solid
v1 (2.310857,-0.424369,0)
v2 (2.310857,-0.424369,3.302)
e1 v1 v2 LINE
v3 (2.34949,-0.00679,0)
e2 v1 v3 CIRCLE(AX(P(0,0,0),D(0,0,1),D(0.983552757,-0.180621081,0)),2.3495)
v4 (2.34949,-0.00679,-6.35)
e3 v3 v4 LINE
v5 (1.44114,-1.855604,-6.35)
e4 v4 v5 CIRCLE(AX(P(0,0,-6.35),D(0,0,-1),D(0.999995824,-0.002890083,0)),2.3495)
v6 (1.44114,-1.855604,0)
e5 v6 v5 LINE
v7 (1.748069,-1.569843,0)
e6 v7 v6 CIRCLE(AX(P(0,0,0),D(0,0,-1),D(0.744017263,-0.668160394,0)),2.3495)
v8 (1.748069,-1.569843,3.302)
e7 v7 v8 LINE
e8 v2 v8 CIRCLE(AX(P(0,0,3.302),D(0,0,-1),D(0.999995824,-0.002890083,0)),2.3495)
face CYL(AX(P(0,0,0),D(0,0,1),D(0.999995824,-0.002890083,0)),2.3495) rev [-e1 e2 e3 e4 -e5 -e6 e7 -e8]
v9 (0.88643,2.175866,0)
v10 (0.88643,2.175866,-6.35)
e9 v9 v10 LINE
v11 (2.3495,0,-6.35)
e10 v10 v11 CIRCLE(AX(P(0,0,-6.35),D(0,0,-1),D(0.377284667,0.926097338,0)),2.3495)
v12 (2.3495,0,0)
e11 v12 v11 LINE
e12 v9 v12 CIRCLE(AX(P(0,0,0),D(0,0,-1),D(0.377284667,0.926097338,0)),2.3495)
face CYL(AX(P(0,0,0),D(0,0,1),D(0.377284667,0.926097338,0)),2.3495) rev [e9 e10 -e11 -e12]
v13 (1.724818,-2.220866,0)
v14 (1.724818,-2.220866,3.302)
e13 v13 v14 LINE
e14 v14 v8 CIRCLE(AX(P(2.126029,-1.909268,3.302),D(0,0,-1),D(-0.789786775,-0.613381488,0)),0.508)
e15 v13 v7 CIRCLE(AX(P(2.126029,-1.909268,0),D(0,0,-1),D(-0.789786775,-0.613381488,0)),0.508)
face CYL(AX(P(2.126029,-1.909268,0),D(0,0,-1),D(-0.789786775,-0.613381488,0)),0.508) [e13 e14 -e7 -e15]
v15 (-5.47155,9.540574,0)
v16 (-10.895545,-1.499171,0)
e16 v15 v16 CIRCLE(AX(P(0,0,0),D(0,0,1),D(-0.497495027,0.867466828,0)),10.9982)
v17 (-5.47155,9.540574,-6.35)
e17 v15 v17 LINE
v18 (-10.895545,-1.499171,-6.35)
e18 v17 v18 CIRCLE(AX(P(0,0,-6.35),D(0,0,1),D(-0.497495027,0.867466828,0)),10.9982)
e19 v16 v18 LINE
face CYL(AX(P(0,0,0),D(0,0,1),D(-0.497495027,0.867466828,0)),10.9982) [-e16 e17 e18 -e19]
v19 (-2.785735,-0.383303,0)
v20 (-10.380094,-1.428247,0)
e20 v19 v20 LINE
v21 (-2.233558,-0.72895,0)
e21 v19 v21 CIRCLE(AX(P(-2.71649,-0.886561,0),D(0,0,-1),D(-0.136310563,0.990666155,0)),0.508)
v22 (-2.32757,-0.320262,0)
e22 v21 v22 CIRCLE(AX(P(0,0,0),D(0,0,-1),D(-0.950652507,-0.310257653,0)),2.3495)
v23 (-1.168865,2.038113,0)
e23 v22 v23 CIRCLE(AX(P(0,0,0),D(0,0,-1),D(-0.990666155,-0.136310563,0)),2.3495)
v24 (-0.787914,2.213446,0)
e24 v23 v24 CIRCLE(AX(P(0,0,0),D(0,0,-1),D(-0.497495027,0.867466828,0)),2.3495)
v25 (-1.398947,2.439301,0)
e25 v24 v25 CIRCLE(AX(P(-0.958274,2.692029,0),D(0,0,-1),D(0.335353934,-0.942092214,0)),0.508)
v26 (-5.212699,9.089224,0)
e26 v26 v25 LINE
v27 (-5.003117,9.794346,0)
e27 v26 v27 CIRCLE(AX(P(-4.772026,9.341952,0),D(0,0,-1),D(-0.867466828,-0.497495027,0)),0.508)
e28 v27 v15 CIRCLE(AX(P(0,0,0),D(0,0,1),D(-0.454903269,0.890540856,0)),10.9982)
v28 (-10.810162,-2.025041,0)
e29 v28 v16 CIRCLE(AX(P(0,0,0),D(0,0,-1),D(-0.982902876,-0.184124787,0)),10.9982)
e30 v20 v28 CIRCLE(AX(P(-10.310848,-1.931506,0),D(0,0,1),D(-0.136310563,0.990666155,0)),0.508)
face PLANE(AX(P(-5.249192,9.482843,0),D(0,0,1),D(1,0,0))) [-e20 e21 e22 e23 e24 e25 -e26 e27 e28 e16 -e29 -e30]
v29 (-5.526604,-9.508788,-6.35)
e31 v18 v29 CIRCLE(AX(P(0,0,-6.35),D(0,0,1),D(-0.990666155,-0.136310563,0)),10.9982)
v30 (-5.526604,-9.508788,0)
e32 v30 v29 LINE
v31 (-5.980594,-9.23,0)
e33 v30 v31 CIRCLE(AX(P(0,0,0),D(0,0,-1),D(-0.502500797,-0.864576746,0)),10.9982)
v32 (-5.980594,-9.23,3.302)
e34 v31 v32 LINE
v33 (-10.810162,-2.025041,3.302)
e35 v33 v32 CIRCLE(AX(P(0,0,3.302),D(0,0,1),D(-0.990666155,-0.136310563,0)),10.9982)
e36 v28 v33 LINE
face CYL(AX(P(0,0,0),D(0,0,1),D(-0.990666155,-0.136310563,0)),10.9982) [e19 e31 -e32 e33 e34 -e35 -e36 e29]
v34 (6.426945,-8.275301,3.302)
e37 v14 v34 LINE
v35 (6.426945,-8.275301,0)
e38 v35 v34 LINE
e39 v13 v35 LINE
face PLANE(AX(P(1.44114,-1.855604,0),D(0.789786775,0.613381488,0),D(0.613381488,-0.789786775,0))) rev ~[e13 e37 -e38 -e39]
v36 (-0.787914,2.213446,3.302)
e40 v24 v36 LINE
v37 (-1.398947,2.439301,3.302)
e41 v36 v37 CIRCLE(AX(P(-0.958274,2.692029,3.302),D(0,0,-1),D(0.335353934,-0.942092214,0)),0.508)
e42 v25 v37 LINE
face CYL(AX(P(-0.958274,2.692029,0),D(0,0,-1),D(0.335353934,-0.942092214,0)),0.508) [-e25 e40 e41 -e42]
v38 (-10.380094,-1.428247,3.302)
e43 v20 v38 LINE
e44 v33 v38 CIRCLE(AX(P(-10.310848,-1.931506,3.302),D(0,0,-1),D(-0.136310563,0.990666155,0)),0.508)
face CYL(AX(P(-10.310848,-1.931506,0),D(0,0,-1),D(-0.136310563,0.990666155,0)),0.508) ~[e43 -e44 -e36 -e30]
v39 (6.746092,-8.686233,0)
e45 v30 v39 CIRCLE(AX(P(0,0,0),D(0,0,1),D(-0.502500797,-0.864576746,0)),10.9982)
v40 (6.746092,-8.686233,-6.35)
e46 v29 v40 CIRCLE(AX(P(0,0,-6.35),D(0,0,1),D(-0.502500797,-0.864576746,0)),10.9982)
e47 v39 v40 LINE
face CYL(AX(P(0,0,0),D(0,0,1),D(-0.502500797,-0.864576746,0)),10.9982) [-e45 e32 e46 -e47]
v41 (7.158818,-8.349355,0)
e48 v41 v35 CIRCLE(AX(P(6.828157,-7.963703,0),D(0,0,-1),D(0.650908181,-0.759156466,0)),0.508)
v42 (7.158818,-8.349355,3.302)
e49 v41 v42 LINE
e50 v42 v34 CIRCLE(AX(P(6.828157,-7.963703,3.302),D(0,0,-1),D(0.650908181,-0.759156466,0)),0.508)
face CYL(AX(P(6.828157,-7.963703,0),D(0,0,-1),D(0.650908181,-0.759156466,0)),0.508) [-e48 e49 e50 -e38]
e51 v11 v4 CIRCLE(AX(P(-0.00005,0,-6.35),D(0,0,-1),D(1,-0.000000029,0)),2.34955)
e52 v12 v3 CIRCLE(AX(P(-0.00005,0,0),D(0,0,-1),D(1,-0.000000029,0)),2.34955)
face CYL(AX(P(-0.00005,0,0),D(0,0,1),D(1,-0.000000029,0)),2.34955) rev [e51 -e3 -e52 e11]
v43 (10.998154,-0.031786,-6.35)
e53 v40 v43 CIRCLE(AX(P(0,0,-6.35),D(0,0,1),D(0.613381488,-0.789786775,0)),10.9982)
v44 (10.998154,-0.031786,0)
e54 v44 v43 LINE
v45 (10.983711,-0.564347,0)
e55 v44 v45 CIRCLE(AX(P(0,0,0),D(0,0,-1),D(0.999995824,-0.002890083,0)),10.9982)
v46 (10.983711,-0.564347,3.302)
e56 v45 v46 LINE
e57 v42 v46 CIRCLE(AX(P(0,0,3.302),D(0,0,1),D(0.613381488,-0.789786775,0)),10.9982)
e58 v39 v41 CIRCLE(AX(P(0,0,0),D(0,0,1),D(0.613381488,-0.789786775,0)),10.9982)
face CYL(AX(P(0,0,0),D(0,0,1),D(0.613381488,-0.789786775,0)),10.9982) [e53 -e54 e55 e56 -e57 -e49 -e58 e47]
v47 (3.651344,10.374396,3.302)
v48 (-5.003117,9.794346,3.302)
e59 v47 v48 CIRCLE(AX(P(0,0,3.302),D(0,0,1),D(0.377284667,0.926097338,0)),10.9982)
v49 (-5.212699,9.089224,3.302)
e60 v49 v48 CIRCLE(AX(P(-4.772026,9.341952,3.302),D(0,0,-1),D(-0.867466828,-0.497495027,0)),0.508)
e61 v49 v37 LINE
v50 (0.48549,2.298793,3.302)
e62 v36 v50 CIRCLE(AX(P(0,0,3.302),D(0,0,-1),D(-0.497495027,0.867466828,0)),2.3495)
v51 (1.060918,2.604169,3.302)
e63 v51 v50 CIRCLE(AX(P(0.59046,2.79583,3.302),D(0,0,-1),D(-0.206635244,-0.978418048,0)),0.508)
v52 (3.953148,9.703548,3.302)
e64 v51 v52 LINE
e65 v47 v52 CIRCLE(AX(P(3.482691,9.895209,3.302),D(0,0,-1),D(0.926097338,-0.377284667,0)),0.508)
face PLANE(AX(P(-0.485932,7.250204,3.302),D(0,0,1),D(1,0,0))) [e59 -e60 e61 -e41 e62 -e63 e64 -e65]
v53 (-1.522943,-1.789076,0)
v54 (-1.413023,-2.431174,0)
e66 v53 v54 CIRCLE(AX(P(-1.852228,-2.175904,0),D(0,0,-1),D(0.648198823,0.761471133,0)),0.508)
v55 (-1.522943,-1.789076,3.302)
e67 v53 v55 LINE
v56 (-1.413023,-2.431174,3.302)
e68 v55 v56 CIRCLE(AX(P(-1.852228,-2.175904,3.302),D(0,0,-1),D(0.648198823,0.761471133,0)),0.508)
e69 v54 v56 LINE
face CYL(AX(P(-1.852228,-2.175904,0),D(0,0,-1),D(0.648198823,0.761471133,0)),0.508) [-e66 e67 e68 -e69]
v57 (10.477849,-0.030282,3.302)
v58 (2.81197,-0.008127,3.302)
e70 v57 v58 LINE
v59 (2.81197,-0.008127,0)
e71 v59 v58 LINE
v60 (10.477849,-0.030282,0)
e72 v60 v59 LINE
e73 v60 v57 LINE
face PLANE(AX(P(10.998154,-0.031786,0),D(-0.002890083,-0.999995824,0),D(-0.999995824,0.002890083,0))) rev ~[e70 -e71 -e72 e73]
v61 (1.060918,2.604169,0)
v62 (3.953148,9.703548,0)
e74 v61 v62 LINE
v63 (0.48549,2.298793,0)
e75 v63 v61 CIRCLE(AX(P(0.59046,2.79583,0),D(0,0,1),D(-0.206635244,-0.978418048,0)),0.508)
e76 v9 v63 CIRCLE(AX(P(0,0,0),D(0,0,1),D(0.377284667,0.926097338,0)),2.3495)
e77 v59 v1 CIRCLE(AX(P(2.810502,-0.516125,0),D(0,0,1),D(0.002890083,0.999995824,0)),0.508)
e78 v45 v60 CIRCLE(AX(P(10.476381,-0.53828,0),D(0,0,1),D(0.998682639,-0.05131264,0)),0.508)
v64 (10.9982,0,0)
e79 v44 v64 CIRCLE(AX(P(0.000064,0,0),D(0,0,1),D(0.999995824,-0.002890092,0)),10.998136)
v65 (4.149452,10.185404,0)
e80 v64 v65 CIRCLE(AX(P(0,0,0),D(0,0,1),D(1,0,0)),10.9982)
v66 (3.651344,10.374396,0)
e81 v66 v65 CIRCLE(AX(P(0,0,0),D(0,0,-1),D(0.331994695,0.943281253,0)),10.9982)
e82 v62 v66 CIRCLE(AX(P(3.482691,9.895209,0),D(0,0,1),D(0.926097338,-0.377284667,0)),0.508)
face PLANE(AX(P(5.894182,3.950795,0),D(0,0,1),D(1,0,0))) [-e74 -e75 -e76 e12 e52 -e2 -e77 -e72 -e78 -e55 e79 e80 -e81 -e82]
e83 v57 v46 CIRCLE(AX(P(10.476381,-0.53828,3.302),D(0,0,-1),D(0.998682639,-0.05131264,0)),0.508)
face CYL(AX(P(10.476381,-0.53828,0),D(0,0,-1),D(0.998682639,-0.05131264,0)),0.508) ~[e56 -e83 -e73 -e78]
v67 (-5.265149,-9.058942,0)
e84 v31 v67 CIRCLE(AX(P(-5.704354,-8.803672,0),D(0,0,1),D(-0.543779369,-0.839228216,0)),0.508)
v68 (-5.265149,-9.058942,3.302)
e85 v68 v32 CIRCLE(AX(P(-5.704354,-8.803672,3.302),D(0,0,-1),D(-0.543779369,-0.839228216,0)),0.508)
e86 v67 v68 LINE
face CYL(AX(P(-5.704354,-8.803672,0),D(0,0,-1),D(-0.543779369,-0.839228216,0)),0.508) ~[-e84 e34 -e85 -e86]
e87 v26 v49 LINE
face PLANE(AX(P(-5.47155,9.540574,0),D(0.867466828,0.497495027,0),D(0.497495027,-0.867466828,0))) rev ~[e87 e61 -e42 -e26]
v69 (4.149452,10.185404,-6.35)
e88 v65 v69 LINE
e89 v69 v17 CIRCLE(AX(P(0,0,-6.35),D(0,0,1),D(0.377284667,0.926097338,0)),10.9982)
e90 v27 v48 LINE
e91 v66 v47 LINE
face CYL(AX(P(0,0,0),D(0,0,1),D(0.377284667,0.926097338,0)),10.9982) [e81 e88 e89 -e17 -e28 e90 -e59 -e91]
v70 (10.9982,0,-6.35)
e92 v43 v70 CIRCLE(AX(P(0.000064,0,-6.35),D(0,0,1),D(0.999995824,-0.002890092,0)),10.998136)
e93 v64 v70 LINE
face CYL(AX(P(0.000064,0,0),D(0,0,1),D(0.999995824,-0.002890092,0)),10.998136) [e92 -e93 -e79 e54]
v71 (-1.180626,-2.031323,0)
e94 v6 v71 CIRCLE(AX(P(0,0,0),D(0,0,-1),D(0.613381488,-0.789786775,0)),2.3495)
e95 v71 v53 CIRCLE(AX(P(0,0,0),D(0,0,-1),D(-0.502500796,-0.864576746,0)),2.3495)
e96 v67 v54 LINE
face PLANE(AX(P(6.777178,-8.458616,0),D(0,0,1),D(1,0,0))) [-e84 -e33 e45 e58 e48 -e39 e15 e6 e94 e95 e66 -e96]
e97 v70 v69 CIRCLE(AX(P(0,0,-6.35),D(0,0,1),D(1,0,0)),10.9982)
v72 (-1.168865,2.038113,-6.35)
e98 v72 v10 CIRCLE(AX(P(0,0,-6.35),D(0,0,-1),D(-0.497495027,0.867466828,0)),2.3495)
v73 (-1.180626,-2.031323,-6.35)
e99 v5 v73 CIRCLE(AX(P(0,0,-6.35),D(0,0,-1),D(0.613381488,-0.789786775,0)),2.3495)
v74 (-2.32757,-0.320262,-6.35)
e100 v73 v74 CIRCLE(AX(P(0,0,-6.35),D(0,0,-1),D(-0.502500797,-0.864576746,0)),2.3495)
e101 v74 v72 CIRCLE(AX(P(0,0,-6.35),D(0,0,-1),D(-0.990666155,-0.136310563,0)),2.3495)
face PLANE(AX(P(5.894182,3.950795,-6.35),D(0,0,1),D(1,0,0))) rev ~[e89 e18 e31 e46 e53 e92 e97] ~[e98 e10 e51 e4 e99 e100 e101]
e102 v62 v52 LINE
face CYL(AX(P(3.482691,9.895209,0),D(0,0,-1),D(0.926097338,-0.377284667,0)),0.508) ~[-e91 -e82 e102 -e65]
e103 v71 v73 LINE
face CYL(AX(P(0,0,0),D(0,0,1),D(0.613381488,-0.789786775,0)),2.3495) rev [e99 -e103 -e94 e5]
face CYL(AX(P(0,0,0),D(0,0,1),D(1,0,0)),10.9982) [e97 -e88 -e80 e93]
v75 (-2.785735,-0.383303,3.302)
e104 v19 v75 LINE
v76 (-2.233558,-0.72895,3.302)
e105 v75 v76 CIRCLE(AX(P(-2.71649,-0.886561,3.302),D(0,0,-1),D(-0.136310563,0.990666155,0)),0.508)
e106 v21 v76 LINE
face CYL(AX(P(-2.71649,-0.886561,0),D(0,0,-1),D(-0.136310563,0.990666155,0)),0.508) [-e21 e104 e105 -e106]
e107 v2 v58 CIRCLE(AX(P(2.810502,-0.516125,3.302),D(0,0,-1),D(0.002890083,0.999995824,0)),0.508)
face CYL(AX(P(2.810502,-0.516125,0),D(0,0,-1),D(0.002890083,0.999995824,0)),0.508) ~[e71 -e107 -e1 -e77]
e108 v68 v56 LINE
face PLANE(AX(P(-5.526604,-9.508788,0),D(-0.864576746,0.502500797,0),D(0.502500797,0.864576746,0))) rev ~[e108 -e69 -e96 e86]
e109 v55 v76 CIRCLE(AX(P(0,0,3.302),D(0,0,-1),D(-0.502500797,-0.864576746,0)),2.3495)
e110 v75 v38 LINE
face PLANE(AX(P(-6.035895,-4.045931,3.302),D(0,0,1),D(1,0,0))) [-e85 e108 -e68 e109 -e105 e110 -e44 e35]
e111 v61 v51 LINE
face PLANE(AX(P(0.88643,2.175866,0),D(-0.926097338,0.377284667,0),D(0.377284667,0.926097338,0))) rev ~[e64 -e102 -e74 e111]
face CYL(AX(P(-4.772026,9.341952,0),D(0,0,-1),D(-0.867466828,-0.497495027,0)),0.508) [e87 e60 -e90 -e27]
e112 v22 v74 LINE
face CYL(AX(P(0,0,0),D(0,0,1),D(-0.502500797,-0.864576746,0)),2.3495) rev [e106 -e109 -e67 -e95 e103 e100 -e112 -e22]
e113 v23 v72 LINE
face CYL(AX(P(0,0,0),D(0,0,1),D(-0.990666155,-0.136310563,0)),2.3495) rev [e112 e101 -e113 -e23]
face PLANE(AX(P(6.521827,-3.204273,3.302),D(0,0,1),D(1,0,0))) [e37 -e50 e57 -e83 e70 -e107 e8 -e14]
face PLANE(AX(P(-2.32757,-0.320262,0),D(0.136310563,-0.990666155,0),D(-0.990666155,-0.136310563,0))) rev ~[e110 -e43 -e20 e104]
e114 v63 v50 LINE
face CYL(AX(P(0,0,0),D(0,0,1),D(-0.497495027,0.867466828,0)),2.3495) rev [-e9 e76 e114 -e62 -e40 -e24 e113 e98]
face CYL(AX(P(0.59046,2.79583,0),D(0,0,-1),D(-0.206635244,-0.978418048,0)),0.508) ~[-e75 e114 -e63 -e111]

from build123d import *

# Parameters (mm, degrees)
F1_DEPTH    = 3.302
F2_DEPTH    = 6.35
F3_T1_DEPTH = 4.6338919233
F4_T1_DEPTH = 4.4582047696


# Not quite as in the source:
# - a fillet or chamfer that OpenCascade refuses, or shapes differently, is made with other operations: its cross-section is extruded or revolved along the edge and cut away or added


with BuildPart() as f1:
    # F0 (on Top) → F1 (new body)
    with BuildSketch(Plane.XY):
        with BuildLine():
            Line((0.8864303251, 2.1758656964), (4.1494522244, 10.1854037464))
            ThreePointArc((4.1494522244, 10.1854037464), (-0.7354841661, 10.9735803766), (-5.4715498037, 9.5405736717))
            Line((-5.4715498037, 9.5405736717), (-1.1688645655, 2.0381133132))
            ThreePointArc((-1.1688645655, 2.0381133132), (-0.157118442, 2.3442406116), (0.8864303251, 2.1758656964))
        make_face()
    extrude(amount=F1_DEPTH)



with BuildPart() as f1b:
    # F0 (on Top) → F1, piece 2 (new body)
    with BuildSketch(Plane.XY):
        with BuildLine():
            Line((-2.3275701308, -0.320261668), (-10.8955445044, -1.4991708351))
            ThreePointArc((-10.8955445044, -1.4991708351), (-9.1356572935, -6.1237381602), (-5.5266042645, -9.5087879639))
            Line((-5.5266042645, -9.5087879639), (-1.1806256223, -2.0313230639))
            ThreePointArc((-1.1806256223, -2.0313230639), (-1.9516127013, -1.3081888679), (-2.3275701308, -0.320261668))
        make_face()
    extrude(amount=F1_DEPTH)


with BuildPart() as f1c:
    # F0 (on Top) → F1, piece 3 (new body)
    with BuildSketch(Plane.XY):
        with BuildLine():
            ThreePointArc((6.74609228, -8.6862329113), (9.8711414597, -4.8498422164), (10.9981540682, -0.0317857078))
            Line((10.9981540682, -0.0317857078), (2.3494901878, -0.0067902494))
            ThreePointArc((2.3494901878, -0.0067902494), (2.1087311432, -1.0360517437), (1.4411398058, -1.8556040284))
            Line((1.4411398058, -1.8556040284), (6.74609228, -8.6862329113))
        make_face()
    extrude(amount=F1_DEPTH)


with BuildPart() as f1_1:
    add(f1.part)

    add(f1b.part)  # F2 merges F1b

    add(f1c.part)  # F2 merges F1c
    # F0 (on Top) → F2 (join)
    with BuildSketch(Plane.XY):
        with BuildLine():
            ThreePointArc((10.9981540682, -0.0317857078), (10.9981885171, -0.0158928705), (10.9982, 0))
            ThreePointArc((10.9982, 0), (9.1267986911, 6.136933183), (4.1494522244, 10.1854037464))
            Line((4.1494522244, 10.1854037464), (0.8864303251, 2.1758656964))
            ThreePointArc((0.8864303251, 2.1758656964), (1.9497202747, 1.3110076661), (2.3495, 0))
            ThreePointArc((2.3495, 0), (2.3494975469, -0.0033951282), (2.3494901878, -0.0067902494))
            Line((2.3494901878, -0.0067902494), (10.9981540682, -0.0317857078))
        make_face()
        with BuildLine():
            Line((0.8864303251, 2.1758656964), (4.1494522244, 10.1854037464))
            ThreePointArc((4.1494522244, 10.1854037464), (-0.7354841661, 10.9735803766), (-5.4715498037, 9.5405736717))
            Line((-5.4715498037, 9.5405736717), (-1.1688645655, 2.0381133132))
            ThreePointArc((-1.1688645655, 2.0381133132), (-0.157118442, 2.3442406116), (0.8864303251, 2.1758656964))
        make_face()
        with BuildLine():
            ThreePointArc((6.74609228, -8.6862329113), (9.8711414597, -4.8498422164), (10.9981540682, -0.0317857078))
            Line((10.9981540682, -0.0317857078), (2.3494901878, -0.0067902494))
            ThreePointArc((2.3494901878, -0.0067902494), (2.1087311432, -1.0360517437), (1.4411398058, -1.8556040284))
            Line((1.4411398058, -1.8556040284), (6.74609228, -8.6862329113))
        make_face()
        with BuildLine():
            Line((-1.1688645655, 2.0381133132), (-5.4715498037, 9.5405736717))
            ThreePointArc((-5.4715498037, 9.5405736717), (-9.8711414597, 4.8498422164), (-10.8955445044, -1.4991708351))
            Line((-10.8955445044, -1.4991708351), (-2.3275701308, -0.320261668))
            ThreePointArc((-2.3275701308, -0.320261668), (-2.1087311432, 1.0360517437), (-1.1688645655, 2.0381133132))
        make_face()
        with BuildLine():
            ThreePointArc((-5.5266042645, -9.5087879639), (0.7354841661, -10.9735803766), (6.74609228, -8.6862329113))
            Line((6.74609228, -8.6862329113), (1.4411398058, -1.8556040284))
            ThreePointArc((1.4411398058, -1.8556040284), (0.157118442, -2.3442406116), (-1.1806256223, -2.0313230639))
            Line((-1.1806256223, -2.0313230639), (-5.5266042645, -9.5087879639))
        make_face()
        with BuildLine():
            Line((-2.3275701308, -0.320261668), (-10.8955445044, -1.4991708351))
            ThreePointArc((-10.8955445044, -1.4991708351), (-9.1356572935, -6.1237381602), (-5.5266042645, -9.5087879639))
            Line((-5.5266042645, -9.5087879639), (-1.1806256223, -2.0313230639))
            ThreePointArc((-1.1806256223, -2.0313230639), (-1.9516127013, -1.3081888679), (-2.3275701308, -0.320261668))
        make_face()
    extrude(amount=-F2_DEPTH)

    # F3: fillet of radius 0.508 on 6 edges, made by hand

    # F3_s2 → F3_t1 (cut)
    with BuildSketch(Plane.XY):
        with BuildLine():
            ThreePointArc((3.9531481969, 9.7035483908), (3.9459668292, 10.1036299064), (3.6513440541, 10.3743958782))
            ThreePointArc((3.6513440541, 10.3743958782), (3.901542663, 10.2829163222), (4.1494522244, 10.1854037464))
            Line((4.1494522244, 10.1854037464), (3.9531481969, 9.7035483908))
        make_face()
        with BuildLine():
            ThreePointArc((10.9837113978, -0.5643466757), (10.8451967866, -0.1889395718), (10.4778487793, -0.0302819762))
            Line((10.4778487793, -0.0302819762), (10.9981540682, -0.0317857078))
            ThreePointArc((10.9981540682, -0.0317857078), (10.9941578867, -0.2981536556), (10.9837113978, -0.5643466757))
        make_face()
        with BuildLine():
            ThreePointArc((-5.212699429, 9.089224208), (-5.2589719244, 9.4866857122), (-5.0031171412, 9.7943464361))
            ThreePointArc((-5.0031171412, 9.7943464361), (-5.2388703034, 9.6702968509), (-5.4715498037, 9.5405736717))
            Line((-5.4715498037, 9.5405736717), (-5.212699429, 9.089224208))
        make_face()
        with BuildLine():
            ThreePointArc((7.1588183524, -8.3493546479), (6.7770167548, -8.4691224698), (6.4269453148, -8.2753009589))
            Line((6.4269453148, -8.2753009589), (6.74609228, -8.6862329113))
            ThreePointArc((6.74609228, -8.6862329113), (6.9544954285, -8.5202932212), (7.1588183524, -8.3493546479))
        make_face()
        with BuildLine():
            ThreePointArc((-5.9805942565, -9.2299997605), (-5.5862248623, -9.2977461404), (-5.2651493503, -9.0589422318))
            Line((-5.2651493503, -9.0589422318), (-5.5266042645, -9.5087879639))
            ThreePointArc((-5.5266042645, -9.5087879639), (-5.7552875833, -9.3721431953), (-5.9805942565, -9.2299997605))
        make_face()
        with BuildLine():
            ThreePointArc((-10.3800935118, -1.428247432), (-10.722983584, -1.6345074366), (-10.8101624065, -2.0250412303))
            ThreePointArc((-10.8101624065, -2.0250412303), (-10.8560380915, -1.762623101), (-10.8955445044, -1.4991708351))
            Line((-10.8955445044, -1.4991708351), (-10.3800935118, -1.428247432))
        make_face()
    extrude(amount=F3_T1_DEPTH, mode=Mode.SUBTRACT)

    # F4: fillet of radius 0.508 on 6 edges, made by hand

    # F4_s2 → F4_t1 (cut)
    with BuildSketch(Plane.XY):
        with BuildLine():
            ThreePointArc((-2.7857353042, -0.3833028373), (-2.4469491553, -0.4559663275), (-2.2335580647, -0.7289503561))
            ThreePointArc((-2.2335580647, -0.7289503561), (-2.2897006824, -0.5267077321), (-2.3275701308, -0.320261668))
            Line((-2.3275701308, -0.320261668), (-2.7857353042, -0.3833028373))
        make_face()
        with BuildLine():
            ThreePointArc((-1.5229431343, -1.7890764264), (-1.3515120564, -2.0901867434), (-1.4130231496, -2.4311741667))
            Line((-1.4130231496, -2.4311741667), (-1.1806256223, -2.0313230639))
            ThreePointArc((-1.1806256223, -2.0313230639), (-1.3572000088, -1.9178525455), (-1.5229431343, -1.7890764264))
        make_face()
        with BuildLine():
            ThreePointArc((-0.7879140674, 2.2134456561), (-1.1343987902, 2.215537146), (-1.3989470146, 2.439301027))
            Line((-1.3989470146, 2.439301027), (-1.1688645655, 2.0381133132))
            ThreePointArc((-1.1688645655, 2.0381133132), (-0.9823090207, 2.1342959584), (-0.7879140674, 2.2134456561))
        make_face()
        with BuildLine():
            ThreePointArc((0.4854895058, 2.2987932029), (0.8285961548, 2.3471032941), (1.0609176577, 2.6041689603))
            Line((1.0609176577, 2.6041689603), (0.8864303251, 2.1758656964))
            ThreePointArc((0.8864303251, 2.1758656964), (0.6887080648, 2.2462928241), (0.4854895058, 2.2987932029))
        make_face()
        with BuildLine():
            ThreePointArc((1.7248176465, -2.220866123), (1.6183530006, -1.8911369665), (1.7480685589, -1.5698428468))
            ThreePointArc((1.7480685589, -1.5698428468), (1.6009926176, -1.719585092), (1.4411398058, -1.8556040284))
            Line((1.4411398058, -1.8556040284), (1.7248176465, -2.220866123))
        make_face()
        with BuildLine():
            ThreePointArc((2.8119701642, -0.0081268603), (2.4859108466, -0.1253504027), (2.3108572018, -0.4243692296))
            ThreePointArc((2.3108572018, -0.4243692296), (2.3395090295, -0.2164434129), (2.3494901878, -0.0067902494))
            Line((2.3494901878, -0.0067902494), (2.8119701642, -0.0081268603))
        make_face()
    extrude(amount=F4_T1_DEPTH, mode=Mode.SUBTRACT)


solid = f1_1.part
